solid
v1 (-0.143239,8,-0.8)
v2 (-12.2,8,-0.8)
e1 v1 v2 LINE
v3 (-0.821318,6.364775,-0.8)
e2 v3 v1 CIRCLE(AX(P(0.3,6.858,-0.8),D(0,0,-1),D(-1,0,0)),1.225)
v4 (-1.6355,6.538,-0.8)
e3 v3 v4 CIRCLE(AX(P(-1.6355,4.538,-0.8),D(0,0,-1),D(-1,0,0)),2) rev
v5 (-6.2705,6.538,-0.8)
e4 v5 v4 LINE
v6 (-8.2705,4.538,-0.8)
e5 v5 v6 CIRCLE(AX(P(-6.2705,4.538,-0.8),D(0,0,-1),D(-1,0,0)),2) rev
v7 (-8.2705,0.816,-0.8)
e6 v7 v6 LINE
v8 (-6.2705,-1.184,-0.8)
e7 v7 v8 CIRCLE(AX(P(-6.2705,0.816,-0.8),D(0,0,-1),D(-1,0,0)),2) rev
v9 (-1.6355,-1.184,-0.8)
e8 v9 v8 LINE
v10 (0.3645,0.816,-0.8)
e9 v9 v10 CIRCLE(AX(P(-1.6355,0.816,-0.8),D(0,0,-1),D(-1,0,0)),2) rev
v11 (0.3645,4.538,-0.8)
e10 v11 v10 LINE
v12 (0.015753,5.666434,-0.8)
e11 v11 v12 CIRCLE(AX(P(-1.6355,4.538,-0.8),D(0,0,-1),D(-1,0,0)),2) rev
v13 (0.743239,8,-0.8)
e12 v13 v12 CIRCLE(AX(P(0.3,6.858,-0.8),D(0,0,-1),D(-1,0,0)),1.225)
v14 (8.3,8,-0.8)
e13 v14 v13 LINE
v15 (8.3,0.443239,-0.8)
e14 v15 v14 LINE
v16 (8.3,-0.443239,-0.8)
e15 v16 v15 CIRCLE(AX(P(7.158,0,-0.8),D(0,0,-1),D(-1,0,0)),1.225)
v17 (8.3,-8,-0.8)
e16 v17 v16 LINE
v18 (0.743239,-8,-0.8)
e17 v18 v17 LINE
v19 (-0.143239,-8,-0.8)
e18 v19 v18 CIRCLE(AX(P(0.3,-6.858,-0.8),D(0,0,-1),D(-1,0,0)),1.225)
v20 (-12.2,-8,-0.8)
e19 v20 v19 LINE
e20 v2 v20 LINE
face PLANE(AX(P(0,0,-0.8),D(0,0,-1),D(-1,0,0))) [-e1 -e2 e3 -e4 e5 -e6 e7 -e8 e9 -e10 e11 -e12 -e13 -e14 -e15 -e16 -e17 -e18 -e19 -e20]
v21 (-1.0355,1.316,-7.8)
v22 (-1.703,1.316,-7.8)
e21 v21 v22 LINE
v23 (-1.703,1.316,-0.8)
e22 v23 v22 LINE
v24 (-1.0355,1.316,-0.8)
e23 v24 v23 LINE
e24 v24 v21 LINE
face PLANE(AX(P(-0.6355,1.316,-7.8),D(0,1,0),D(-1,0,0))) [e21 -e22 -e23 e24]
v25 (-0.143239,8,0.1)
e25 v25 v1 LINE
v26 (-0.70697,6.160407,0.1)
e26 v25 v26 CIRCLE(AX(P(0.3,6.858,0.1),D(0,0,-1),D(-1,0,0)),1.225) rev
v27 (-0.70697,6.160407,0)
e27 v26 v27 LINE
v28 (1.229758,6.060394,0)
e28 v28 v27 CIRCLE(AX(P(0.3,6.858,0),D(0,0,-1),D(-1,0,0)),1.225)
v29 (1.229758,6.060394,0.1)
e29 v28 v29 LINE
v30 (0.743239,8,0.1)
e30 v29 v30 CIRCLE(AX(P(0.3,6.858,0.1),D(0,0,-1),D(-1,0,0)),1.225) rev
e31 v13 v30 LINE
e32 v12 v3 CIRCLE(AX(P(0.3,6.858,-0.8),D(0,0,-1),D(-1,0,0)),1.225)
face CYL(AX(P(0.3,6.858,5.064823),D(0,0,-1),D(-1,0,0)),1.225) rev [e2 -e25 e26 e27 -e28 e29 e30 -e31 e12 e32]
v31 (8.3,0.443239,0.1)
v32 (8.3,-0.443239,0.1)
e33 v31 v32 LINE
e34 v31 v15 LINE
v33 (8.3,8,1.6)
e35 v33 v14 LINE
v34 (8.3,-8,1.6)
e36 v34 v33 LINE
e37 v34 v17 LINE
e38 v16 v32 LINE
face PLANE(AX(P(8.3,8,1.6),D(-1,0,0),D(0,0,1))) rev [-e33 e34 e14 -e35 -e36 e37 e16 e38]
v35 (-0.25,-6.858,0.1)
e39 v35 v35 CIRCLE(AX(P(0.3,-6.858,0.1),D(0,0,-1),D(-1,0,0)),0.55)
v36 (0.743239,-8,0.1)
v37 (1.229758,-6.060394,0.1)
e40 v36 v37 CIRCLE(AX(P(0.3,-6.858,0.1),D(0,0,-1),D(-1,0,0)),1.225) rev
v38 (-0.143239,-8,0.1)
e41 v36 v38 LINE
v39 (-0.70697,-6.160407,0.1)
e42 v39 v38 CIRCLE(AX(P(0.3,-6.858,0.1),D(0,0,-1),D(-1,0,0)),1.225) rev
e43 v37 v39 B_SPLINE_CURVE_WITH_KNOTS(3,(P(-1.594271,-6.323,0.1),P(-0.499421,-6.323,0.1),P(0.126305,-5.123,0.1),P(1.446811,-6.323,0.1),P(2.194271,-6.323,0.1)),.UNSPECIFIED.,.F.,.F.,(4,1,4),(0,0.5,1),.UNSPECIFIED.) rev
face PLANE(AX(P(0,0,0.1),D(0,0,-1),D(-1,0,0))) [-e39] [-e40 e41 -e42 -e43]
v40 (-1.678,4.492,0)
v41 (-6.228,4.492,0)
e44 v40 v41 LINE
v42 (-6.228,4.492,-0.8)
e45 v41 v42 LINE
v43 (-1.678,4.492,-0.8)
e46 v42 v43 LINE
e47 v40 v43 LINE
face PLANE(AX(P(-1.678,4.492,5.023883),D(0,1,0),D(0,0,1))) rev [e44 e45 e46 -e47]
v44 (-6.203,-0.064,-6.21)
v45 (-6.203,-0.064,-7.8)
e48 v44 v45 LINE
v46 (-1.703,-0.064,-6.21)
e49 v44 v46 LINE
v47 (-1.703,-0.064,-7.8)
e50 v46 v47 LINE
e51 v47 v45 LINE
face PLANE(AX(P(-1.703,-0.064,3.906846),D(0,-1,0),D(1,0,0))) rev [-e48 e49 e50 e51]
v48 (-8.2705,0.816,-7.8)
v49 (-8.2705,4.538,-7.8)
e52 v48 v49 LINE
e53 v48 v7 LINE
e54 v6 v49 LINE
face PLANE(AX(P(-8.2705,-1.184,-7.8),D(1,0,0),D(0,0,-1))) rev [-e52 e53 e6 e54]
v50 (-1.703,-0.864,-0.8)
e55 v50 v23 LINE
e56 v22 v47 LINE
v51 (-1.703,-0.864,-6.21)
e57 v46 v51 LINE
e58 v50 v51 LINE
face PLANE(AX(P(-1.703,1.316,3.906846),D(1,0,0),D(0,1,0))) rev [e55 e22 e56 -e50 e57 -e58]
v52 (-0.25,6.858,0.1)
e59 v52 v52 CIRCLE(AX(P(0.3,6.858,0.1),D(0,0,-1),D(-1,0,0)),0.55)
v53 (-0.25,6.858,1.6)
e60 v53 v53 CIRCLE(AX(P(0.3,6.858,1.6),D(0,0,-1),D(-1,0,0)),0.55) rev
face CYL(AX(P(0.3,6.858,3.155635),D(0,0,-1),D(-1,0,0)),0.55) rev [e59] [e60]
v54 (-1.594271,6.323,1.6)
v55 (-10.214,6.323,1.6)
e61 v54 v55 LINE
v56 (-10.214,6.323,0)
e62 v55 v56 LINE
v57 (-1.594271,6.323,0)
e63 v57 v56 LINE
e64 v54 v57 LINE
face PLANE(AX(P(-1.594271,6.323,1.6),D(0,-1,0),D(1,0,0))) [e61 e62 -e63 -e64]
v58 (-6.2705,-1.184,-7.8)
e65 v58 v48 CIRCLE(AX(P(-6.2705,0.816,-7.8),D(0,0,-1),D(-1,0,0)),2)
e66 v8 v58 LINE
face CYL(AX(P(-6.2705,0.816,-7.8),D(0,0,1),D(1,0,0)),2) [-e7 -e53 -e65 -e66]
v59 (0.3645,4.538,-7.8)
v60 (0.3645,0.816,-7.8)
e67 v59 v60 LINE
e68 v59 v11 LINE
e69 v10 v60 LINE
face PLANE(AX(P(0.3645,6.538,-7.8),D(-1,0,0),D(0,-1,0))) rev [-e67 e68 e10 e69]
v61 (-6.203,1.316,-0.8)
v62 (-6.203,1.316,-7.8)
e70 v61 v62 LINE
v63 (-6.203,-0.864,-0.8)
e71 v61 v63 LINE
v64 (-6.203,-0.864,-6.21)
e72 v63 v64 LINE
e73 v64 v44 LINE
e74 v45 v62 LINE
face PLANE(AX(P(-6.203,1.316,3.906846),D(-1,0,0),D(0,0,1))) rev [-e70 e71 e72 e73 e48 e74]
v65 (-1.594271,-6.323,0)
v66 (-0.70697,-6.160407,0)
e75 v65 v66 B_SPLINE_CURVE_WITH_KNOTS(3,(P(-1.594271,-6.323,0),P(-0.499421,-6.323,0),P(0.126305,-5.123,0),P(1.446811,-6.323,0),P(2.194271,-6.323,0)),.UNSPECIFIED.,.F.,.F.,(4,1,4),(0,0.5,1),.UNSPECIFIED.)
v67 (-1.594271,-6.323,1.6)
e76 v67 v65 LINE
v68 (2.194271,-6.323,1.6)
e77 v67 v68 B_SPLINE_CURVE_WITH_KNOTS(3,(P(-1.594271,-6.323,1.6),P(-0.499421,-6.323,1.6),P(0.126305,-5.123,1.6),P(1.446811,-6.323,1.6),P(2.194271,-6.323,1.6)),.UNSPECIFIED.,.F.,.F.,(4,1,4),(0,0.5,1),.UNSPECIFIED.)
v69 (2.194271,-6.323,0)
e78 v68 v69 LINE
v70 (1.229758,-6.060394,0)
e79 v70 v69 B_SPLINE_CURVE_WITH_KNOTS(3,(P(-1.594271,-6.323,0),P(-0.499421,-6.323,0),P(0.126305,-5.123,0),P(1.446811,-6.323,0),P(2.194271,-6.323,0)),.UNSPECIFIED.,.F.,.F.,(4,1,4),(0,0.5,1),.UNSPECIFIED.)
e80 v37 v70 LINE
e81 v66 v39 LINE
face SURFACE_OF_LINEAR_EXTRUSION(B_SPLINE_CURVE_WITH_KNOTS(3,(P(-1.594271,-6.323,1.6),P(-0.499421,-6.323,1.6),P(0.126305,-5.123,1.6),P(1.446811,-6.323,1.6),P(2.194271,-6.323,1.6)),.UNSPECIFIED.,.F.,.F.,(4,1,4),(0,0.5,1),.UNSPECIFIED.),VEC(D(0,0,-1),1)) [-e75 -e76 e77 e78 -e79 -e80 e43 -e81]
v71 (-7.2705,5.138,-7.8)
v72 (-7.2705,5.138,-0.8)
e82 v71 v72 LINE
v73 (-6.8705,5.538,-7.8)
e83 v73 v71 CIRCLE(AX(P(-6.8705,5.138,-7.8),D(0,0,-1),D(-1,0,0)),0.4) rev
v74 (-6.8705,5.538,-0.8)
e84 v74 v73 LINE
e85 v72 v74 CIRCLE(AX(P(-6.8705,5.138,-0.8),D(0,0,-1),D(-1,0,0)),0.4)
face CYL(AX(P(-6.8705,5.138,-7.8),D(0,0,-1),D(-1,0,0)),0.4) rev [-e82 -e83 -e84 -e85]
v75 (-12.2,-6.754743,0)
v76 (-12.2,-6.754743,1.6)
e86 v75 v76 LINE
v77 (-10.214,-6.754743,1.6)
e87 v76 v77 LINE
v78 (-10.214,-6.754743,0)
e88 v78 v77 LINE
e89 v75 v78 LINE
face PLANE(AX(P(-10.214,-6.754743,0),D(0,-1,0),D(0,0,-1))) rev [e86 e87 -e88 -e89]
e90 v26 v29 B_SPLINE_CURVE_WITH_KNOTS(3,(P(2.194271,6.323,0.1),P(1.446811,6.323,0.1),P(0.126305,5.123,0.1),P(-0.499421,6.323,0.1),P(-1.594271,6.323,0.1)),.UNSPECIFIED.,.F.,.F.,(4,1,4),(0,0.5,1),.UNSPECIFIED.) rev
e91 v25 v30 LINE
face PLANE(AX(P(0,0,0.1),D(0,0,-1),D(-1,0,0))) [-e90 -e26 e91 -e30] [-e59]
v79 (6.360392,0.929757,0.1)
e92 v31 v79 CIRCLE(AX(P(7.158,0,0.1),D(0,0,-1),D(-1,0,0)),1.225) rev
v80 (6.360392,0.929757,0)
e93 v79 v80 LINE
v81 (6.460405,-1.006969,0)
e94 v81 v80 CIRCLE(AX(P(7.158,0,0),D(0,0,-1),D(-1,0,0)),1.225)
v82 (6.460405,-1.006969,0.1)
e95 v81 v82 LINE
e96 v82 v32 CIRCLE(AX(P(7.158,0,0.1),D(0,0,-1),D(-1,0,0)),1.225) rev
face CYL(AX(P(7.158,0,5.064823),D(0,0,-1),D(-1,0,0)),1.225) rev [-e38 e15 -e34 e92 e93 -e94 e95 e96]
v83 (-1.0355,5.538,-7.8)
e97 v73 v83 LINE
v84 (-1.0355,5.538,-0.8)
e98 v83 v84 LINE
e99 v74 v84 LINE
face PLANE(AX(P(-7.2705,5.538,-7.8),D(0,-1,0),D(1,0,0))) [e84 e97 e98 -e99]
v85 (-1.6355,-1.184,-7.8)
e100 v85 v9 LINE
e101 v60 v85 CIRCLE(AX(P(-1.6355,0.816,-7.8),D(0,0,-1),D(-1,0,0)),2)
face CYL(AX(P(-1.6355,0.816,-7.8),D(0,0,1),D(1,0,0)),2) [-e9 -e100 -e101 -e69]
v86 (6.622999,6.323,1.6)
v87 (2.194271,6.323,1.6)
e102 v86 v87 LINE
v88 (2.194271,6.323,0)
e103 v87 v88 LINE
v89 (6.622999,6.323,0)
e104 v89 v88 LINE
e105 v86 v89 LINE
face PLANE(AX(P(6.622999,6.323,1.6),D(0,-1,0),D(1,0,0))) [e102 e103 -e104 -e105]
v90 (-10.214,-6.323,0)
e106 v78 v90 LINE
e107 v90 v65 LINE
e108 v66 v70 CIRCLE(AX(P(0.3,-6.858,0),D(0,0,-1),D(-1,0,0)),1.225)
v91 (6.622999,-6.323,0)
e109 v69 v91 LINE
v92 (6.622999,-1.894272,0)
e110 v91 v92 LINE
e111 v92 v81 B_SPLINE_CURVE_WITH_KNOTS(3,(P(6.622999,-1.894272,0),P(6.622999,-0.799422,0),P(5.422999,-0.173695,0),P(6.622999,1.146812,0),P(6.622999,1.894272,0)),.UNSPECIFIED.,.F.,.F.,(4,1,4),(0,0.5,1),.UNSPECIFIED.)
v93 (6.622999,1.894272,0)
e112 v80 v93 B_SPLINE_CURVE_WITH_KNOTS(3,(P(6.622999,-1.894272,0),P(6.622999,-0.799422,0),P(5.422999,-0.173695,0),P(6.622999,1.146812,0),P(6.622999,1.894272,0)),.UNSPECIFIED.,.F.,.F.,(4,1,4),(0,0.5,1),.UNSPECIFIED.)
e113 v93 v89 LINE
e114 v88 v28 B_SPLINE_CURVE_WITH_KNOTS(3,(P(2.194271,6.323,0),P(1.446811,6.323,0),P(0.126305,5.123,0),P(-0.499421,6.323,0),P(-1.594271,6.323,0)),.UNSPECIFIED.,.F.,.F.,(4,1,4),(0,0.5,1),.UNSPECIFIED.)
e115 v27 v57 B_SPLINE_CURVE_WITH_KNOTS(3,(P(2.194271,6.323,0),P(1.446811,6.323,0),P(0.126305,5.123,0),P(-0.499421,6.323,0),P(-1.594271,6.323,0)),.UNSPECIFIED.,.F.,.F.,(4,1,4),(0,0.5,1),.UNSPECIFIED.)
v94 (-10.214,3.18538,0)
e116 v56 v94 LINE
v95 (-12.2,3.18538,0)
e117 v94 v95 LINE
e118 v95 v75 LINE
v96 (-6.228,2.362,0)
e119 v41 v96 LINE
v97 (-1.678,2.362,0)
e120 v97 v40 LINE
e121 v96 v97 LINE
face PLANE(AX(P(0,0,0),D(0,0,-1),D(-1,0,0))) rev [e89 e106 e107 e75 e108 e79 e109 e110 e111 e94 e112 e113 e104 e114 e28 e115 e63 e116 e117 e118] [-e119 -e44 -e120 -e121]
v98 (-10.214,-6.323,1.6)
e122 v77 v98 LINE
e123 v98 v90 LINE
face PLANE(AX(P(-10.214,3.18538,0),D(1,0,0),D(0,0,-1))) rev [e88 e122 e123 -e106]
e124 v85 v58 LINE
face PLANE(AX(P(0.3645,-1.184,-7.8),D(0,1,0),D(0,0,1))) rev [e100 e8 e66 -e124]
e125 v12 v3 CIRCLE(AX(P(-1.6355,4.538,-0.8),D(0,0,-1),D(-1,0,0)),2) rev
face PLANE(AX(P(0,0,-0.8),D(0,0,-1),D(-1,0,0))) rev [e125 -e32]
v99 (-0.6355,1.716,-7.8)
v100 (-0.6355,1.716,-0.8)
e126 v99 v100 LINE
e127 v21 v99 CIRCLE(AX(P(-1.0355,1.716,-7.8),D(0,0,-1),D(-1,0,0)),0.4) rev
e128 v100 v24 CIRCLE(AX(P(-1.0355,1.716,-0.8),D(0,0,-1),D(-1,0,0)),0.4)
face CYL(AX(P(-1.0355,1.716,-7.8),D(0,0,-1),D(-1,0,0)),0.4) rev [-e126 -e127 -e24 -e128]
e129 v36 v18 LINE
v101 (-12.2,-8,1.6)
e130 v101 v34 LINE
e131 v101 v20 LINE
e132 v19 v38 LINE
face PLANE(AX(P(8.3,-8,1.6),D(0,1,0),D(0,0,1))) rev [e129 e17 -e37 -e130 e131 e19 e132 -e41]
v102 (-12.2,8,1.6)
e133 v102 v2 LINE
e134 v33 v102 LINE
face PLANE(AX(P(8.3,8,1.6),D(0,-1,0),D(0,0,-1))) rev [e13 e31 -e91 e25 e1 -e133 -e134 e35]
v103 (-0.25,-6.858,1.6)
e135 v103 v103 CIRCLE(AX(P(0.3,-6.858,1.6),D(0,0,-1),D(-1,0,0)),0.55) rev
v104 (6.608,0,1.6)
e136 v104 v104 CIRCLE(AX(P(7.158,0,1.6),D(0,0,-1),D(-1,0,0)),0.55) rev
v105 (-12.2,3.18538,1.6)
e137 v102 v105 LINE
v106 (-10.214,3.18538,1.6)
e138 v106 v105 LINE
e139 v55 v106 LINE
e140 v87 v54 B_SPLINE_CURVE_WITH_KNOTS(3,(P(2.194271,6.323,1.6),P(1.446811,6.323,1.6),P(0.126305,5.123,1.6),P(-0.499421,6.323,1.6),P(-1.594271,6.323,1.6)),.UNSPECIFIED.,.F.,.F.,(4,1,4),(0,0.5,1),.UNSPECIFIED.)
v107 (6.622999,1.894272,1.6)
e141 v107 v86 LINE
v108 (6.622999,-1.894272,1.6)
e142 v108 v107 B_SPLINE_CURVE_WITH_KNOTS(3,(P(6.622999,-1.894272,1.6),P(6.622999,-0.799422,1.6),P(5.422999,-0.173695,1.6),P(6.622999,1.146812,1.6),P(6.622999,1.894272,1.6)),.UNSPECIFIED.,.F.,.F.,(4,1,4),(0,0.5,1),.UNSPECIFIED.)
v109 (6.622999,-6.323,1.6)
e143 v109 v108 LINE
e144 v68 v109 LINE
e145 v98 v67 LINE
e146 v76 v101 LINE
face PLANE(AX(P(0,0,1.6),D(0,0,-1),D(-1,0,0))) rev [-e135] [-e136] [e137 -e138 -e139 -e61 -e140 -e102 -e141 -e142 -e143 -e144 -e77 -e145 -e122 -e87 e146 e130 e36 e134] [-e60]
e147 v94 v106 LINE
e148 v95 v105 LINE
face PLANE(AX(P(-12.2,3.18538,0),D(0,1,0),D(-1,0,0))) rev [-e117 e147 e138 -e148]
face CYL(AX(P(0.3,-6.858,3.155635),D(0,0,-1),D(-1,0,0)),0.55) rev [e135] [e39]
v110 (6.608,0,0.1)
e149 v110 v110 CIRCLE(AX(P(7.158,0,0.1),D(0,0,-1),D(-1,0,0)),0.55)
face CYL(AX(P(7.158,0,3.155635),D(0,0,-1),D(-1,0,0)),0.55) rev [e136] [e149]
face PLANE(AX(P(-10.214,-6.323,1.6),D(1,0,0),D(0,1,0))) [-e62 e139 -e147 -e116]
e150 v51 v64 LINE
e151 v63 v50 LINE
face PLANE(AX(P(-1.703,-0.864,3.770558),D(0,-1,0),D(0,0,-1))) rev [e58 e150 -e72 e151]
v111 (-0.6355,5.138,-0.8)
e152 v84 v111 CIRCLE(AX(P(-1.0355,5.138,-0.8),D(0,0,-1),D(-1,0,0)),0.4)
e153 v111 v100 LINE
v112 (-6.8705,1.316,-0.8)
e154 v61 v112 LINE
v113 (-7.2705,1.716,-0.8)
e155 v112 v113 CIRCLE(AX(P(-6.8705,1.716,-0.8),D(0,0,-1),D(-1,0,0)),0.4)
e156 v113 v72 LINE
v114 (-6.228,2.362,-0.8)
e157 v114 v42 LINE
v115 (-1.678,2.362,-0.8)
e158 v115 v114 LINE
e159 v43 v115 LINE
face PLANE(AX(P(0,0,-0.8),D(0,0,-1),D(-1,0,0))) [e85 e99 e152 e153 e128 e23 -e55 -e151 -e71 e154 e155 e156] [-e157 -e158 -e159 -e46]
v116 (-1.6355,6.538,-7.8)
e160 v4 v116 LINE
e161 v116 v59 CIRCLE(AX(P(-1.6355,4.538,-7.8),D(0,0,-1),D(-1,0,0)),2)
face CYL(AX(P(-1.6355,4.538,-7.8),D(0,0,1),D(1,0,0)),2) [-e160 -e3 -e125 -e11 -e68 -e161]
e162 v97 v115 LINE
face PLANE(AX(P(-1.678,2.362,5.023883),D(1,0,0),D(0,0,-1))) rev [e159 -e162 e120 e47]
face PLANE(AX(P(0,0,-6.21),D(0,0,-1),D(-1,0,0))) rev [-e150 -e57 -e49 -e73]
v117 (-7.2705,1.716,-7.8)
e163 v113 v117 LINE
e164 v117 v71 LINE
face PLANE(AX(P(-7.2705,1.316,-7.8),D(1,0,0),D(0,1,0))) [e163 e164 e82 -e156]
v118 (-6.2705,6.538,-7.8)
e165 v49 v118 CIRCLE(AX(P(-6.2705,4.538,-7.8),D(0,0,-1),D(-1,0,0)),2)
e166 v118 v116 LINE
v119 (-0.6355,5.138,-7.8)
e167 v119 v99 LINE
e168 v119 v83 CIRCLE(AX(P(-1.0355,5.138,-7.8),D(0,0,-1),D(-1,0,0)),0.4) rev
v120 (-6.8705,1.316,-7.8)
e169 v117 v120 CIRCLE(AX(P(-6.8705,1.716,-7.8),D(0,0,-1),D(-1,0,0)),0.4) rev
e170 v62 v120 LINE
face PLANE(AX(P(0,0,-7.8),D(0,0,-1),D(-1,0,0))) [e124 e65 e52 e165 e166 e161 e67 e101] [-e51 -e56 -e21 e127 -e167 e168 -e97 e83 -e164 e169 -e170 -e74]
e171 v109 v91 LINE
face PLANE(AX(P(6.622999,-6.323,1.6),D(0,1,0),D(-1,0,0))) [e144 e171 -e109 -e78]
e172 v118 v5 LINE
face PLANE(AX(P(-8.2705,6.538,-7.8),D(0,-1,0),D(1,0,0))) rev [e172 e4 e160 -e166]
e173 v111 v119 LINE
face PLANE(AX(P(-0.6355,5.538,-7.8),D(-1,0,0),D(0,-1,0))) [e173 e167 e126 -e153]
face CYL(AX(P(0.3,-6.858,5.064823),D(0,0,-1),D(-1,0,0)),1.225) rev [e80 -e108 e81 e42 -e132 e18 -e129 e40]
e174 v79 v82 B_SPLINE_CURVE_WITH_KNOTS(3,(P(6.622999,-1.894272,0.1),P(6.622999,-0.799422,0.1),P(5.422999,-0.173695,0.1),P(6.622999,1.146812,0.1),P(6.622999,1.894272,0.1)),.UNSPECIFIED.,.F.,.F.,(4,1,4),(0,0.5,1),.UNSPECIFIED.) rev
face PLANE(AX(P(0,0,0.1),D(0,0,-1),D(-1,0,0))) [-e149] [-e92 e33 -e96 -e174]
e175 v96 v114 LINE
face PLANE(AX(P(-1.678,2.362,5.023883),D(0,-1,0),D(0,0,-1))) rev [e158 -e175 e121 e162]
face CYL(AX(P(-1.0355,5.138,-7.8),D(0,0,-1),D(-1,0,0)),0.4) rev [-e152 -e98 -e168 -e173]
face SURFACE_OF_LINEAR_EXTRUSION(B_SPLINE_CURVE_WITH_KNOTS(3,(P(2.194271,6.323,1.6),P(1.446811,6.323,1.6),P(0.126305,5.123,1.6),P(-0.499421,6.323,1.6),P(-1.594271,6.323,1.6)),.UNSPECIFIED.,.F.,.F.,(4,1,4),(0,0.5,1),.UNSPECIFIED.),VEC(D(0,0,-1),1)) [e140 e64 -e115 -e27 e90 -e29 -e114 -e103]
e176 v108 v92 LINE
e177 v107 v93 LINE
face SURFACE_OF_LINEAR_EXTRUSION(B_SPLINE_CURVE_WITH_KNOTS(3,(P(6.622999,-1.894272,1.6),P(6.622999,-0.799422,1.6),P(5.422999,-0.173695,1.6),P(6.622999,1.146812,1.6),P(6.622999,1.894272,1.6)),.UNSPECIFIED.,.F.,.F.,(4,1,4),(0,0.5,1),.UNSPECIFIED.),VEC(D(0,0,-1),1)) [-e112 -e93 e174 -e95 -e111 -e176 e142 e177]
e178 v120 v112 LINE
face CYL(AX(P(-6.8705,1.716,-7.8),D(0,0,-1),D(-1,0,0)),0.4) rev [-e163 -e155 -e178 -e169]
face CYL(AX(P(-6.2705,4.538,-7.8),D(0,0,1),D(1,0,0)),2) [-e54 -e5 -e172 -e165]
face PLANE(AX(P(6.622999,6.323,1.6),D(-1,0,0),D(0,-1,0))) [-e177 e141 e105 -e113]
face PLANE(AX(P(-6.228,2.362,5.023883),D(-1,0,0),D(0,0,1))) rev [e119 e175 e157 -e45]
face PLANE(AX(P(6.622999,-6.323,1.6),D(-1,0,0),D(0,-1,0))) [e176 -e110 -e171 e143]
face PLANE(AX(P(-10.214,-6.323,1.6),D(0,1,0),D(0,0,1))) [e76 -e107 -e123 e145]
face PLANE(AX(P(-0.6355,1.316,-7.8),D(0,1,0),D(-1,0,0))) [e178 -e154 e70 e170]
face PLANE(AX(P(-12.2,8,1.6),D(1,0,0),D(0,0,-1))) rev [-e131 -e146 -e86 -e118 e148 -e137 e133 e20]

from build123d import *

# Parameters (mm, degrees)
SKETCH11_W          = 20.5
SKETCH11_H          = 16
BOSS_EXTRUDE4_DEPTH = 1.6
SKETCH10_W          = 20.5
SKETCH10_H          = 16
BOSS_EXTRUDE5_DEPTH = 0.8
SKETCH12_R          = 1.225
CUT_EXTRUDE1_DEPTH  = 0.9
SKETCH13_R          = 0.55
CUT_EXTRUDE2_DEPTH  = 1.5
SKETCH14_W          = 4.55
SKETCH14_H          = 2.13
CUT_EXTRUDE3_DEPTH  = 0.8
SKETCH17_W          = 1.985999923
SKETCH17_H          = 9.940122219
CUT_EXTRUDE5_DEPTH  = 1.6
SKETCH18_W          = 8.635
SKETCH18_H          = 7.722
SKETCH18_W_2        = 6.635
SKETCH18_H_2        = 4.222
BOSS_EXTRUDE6_DEPTH = 7
FILLET2_R           = 0.4
FILLET3_R           = 2
SKETCH19_W          = 4.5
SKETCH19_H          = 1.38
CUT_EXTRUDE6_DEPTH  = 7
SKETCH21_W          = 4.5
SKETCH21_H          = 0.8
CUT_EXTRUDE7_DEPTH  = 5.41


with BuildPart() as part:
    # Sketch11 → Boss-Extrude4 (new body)
    with BuildSketch(Plane.XY):
        with Locations((-1.95, 0)):
            Rectangle(SKETCH11_W, SKETCH11_H)
        with BuildLine():
            Line((6.622999053, 6.323000154), (2.19427083, 6.323000154))
            add(Edge.make_bspline(
                [(2.19427083, 6.323000154), (1.446811282, 6.323000154), (0.126304944, 5.123000154), (-0.499421171, 6.323000154), (-1.59427083, 6.323000154)],
                knots=[0, 0, 0, 0, 0.5, 1, 1, 1, 1], degree=3))
            Line((-1.59427083, 6.323000154), (-10.214000077, 6.323000154))
            Line((-10.214000077, 6.323000154), (-10.214000077, -6.323000154))
            Line((-10.214000077, -6.323000154), (-1.59427083, -6.323000154))
            add(Edge.make_bspline(
                [(2.19427083, -6.323000154), (1.446811282, -6.323000154), (0.126304944, -5.123000154), (-0.499421171, -6.323000154), (-1.59427083, -6.323000154)],
                knots=[0, 0, 0, 0, 0.5, 1, 1, 1, 1], degree=3))
            Line((2.19427083, -6.323000154), (6.622999053, -6.323000154))
            Line((6.622999053, -6.323000154), (6.622999053, -1.894271742))
            add(Edge.make_bspline(
                [(6.622999053, 1.894271742), (6.622999053, 1.146811937), (5.422999053, -0.173695015), (6.622999053, -0.799421908), (6.622999053, -1.894271742)],
                knots=[0, 0, 0, 0, 0.5, 1, 1, 1, 1], degree=3))
            Line((6.622999053, 1.894271742), (6.622999053, 6.323000154))
        make_face(mode=Mode.SUBTRACT)
    extrude(amount=BOSS_EXTRUDE4_DEPTH)

    # Sketch10 → Boss-Extrude5 (add)
    with BuildSketch(Plane.XY):
        with Locations((-1.95, 0)):
            Rectangle(SKETCH10_W, SKETCH10_H)
    extrude(amount=-BOSS_EXTRUDE5_DEPTH)

    # Sketch12 → Cut-Extrude1 (cut)
    with BuildSketch(Plane(origin=(0, 0, -0.8), x_dir=(-1, 0, 0), z_dir=(0, 0, -1))):
        with Locations((-0.3, 6.857999949)):
            Circle(SKETCH12_R)
        with Locations((-7.157999783, 0)):
            Circle(SKETCH12_R)
        with Locations((-0.3, -6.857999949)):
            Circle(SKETCH12_R)
    extrude(amount=-CUT_EXTRUDE1_DEPTH, mode=Mode.SUBTRACT)

    # Sketch13 → Cut-Extrude2 (cut)
    with BuildSketch(Plane(origin=(0, 0, 0.1), x_dir=(-1, 0, 0), z_dir=(0, 0, -1))):
        with Locations((-0.3, 6.857999949)):
            Circle(SKETCH13_R)
        with Locations((-7.157999783, 0)):
            Circle(SKETCH13_R)
        with Locations((-0.3, -6.857999949)):
            Circle(SKETCH13_R)
    extrude(amount=-CUT_EXTRUDE2_DEPTH, mode=Mode.SUBTRACT)

    # Sketch14 → Cut-Extrude3 (cut)
    with BuildSketch(Plane(origin=(0, 0, -0.8), x_dir=(-1, 0, 0), z_dir=(0, 0, -1))):
        with Locations((3.953000077, 3.426999846)):
            Rectangle(SKETCH14_W, SKETCH14_H)
    extrude(amount=-CUT_EXTRUDE3_DEPTH, mode=Mode.SUBTRACT)

    # Sketch17 → Cut-Extrude5 (cut)
    with BuildSketch(Plane.XY.offset(1.6)):
        with Locations((-11.207000039, -1.784681503)):
            Rectangle(SKETCH17_W, SKETCH17_H)
    extrude(amount=-CUT_EXTRUDE5_DEPTH, mode=Mode.SUBTRACT)

    # Sketch18 → Boss-Extrude6 (add)
    with BuildSketch(Plane(origin=(0, 0, -0.8), x_dir=(-1, 0, 0), z_dir=(0, 0, -1))):
        with Locations((3.953000077, 2.676999846)):
            Rectangle(SKETCH18_W, SKETCH18_H)
        with Locations((3.953000077, 3.426999846)):
            Rectangle(SKETCH18_W_2, SKETCH18_H_2, mode=Mode.SUBTRACT)
    extrude(amount=BOSS_EXTRUDE6_DEPTH)

    # Fillet2
    fillet2_edges = [part.edges().sort_by_distance(p)[0] for p in [
        (-0.635500077, 5.537999846, -4.3),
        (-0.635500077, 1.315999846, -4.3),
        (-7.270500077, 1.315999846, -4.3),
        (-7.270500077, 5.537999846, -4.3),
    ]]
    fillet(fillet2_edges, radius=FILLET2_R)

    # Fillet3
    # the kernel refuses this fillet: 2 mm, written as the material it takes off along each edge
    with BuildSketch(Plane(origin=(-8.270500077, 6.537999846, -0.8), x_dir=(0, -1, 0), z_dir=(0, 0, -1)), Plane(origin=(0.364499923, -1.184000154, -0.8), x_dir=(0, 1, 0), z_dir=(0, 0, -1)), Plane(origin=(-8.270500077, -1.184000154, -0.8), x_dir=(1, 0, 0), z_dir=(0, 0, -1))) as fillet3_piece_1:
        with BuildLine():
            CenterArc((FILLET3_R, -FILLET3_R), FILLET3_R, 90, 90)
            Line((0, -FILLET3_R), (0, 0))
            Line((0, 0), (FILLET3_R, 0))
        make_face()
    extrude(amount=12, mode=Mode.SUBTRACT)
    with BuildSketch(Plane(origin=(0.364499923, 6.537999846, -0.8), x_dir=(0, -1, 0), z_dir=(0, 0, -1))) as fillet3_piece_2:
        with BuildLine():
            CenterArc((FILLET3_R, FILLET3_R), FILLET3_R, 180, 90)
            Line((0, FILLET3_R), (0, 0))
            Line((0, 0), (FILLET3_R, 0))
        make_face()
    extrude(amount=12, mode=Mode.SUBTRACT)

    # Sketch19 → Cut-Extrude6 (cut)
    with BuildSketch(Plane(origin=(0, 0, -7.8), x_dir=(-1, 0, 0), z_dir=(0, 0, -1))):
        with Locations((3.953000077, 0.625999846)):
            Rectangle(SKETCH19_W, SKETCH19_H)
    extrude(amount=-CUT_EXTRUDE6_DEPTH, mode=Mode.SUBTRACT)

    # Sketch21 → Cut-Extrude7 (cut)
    with BuildSketch(Plane(origin=(0, 0, -6.21), x_dir=(-1, 0, 0), z_dir=(0, 0, -1))):
        with Locations((3.953000077, -0.464000154)):
            Rectangle(SKETCH21_W, SKETCH21_H)
    extrude(amount=-CUT_EXTRUDE7_DEPTH, mode=Mode.SUBTRACT)


solid = part.part
